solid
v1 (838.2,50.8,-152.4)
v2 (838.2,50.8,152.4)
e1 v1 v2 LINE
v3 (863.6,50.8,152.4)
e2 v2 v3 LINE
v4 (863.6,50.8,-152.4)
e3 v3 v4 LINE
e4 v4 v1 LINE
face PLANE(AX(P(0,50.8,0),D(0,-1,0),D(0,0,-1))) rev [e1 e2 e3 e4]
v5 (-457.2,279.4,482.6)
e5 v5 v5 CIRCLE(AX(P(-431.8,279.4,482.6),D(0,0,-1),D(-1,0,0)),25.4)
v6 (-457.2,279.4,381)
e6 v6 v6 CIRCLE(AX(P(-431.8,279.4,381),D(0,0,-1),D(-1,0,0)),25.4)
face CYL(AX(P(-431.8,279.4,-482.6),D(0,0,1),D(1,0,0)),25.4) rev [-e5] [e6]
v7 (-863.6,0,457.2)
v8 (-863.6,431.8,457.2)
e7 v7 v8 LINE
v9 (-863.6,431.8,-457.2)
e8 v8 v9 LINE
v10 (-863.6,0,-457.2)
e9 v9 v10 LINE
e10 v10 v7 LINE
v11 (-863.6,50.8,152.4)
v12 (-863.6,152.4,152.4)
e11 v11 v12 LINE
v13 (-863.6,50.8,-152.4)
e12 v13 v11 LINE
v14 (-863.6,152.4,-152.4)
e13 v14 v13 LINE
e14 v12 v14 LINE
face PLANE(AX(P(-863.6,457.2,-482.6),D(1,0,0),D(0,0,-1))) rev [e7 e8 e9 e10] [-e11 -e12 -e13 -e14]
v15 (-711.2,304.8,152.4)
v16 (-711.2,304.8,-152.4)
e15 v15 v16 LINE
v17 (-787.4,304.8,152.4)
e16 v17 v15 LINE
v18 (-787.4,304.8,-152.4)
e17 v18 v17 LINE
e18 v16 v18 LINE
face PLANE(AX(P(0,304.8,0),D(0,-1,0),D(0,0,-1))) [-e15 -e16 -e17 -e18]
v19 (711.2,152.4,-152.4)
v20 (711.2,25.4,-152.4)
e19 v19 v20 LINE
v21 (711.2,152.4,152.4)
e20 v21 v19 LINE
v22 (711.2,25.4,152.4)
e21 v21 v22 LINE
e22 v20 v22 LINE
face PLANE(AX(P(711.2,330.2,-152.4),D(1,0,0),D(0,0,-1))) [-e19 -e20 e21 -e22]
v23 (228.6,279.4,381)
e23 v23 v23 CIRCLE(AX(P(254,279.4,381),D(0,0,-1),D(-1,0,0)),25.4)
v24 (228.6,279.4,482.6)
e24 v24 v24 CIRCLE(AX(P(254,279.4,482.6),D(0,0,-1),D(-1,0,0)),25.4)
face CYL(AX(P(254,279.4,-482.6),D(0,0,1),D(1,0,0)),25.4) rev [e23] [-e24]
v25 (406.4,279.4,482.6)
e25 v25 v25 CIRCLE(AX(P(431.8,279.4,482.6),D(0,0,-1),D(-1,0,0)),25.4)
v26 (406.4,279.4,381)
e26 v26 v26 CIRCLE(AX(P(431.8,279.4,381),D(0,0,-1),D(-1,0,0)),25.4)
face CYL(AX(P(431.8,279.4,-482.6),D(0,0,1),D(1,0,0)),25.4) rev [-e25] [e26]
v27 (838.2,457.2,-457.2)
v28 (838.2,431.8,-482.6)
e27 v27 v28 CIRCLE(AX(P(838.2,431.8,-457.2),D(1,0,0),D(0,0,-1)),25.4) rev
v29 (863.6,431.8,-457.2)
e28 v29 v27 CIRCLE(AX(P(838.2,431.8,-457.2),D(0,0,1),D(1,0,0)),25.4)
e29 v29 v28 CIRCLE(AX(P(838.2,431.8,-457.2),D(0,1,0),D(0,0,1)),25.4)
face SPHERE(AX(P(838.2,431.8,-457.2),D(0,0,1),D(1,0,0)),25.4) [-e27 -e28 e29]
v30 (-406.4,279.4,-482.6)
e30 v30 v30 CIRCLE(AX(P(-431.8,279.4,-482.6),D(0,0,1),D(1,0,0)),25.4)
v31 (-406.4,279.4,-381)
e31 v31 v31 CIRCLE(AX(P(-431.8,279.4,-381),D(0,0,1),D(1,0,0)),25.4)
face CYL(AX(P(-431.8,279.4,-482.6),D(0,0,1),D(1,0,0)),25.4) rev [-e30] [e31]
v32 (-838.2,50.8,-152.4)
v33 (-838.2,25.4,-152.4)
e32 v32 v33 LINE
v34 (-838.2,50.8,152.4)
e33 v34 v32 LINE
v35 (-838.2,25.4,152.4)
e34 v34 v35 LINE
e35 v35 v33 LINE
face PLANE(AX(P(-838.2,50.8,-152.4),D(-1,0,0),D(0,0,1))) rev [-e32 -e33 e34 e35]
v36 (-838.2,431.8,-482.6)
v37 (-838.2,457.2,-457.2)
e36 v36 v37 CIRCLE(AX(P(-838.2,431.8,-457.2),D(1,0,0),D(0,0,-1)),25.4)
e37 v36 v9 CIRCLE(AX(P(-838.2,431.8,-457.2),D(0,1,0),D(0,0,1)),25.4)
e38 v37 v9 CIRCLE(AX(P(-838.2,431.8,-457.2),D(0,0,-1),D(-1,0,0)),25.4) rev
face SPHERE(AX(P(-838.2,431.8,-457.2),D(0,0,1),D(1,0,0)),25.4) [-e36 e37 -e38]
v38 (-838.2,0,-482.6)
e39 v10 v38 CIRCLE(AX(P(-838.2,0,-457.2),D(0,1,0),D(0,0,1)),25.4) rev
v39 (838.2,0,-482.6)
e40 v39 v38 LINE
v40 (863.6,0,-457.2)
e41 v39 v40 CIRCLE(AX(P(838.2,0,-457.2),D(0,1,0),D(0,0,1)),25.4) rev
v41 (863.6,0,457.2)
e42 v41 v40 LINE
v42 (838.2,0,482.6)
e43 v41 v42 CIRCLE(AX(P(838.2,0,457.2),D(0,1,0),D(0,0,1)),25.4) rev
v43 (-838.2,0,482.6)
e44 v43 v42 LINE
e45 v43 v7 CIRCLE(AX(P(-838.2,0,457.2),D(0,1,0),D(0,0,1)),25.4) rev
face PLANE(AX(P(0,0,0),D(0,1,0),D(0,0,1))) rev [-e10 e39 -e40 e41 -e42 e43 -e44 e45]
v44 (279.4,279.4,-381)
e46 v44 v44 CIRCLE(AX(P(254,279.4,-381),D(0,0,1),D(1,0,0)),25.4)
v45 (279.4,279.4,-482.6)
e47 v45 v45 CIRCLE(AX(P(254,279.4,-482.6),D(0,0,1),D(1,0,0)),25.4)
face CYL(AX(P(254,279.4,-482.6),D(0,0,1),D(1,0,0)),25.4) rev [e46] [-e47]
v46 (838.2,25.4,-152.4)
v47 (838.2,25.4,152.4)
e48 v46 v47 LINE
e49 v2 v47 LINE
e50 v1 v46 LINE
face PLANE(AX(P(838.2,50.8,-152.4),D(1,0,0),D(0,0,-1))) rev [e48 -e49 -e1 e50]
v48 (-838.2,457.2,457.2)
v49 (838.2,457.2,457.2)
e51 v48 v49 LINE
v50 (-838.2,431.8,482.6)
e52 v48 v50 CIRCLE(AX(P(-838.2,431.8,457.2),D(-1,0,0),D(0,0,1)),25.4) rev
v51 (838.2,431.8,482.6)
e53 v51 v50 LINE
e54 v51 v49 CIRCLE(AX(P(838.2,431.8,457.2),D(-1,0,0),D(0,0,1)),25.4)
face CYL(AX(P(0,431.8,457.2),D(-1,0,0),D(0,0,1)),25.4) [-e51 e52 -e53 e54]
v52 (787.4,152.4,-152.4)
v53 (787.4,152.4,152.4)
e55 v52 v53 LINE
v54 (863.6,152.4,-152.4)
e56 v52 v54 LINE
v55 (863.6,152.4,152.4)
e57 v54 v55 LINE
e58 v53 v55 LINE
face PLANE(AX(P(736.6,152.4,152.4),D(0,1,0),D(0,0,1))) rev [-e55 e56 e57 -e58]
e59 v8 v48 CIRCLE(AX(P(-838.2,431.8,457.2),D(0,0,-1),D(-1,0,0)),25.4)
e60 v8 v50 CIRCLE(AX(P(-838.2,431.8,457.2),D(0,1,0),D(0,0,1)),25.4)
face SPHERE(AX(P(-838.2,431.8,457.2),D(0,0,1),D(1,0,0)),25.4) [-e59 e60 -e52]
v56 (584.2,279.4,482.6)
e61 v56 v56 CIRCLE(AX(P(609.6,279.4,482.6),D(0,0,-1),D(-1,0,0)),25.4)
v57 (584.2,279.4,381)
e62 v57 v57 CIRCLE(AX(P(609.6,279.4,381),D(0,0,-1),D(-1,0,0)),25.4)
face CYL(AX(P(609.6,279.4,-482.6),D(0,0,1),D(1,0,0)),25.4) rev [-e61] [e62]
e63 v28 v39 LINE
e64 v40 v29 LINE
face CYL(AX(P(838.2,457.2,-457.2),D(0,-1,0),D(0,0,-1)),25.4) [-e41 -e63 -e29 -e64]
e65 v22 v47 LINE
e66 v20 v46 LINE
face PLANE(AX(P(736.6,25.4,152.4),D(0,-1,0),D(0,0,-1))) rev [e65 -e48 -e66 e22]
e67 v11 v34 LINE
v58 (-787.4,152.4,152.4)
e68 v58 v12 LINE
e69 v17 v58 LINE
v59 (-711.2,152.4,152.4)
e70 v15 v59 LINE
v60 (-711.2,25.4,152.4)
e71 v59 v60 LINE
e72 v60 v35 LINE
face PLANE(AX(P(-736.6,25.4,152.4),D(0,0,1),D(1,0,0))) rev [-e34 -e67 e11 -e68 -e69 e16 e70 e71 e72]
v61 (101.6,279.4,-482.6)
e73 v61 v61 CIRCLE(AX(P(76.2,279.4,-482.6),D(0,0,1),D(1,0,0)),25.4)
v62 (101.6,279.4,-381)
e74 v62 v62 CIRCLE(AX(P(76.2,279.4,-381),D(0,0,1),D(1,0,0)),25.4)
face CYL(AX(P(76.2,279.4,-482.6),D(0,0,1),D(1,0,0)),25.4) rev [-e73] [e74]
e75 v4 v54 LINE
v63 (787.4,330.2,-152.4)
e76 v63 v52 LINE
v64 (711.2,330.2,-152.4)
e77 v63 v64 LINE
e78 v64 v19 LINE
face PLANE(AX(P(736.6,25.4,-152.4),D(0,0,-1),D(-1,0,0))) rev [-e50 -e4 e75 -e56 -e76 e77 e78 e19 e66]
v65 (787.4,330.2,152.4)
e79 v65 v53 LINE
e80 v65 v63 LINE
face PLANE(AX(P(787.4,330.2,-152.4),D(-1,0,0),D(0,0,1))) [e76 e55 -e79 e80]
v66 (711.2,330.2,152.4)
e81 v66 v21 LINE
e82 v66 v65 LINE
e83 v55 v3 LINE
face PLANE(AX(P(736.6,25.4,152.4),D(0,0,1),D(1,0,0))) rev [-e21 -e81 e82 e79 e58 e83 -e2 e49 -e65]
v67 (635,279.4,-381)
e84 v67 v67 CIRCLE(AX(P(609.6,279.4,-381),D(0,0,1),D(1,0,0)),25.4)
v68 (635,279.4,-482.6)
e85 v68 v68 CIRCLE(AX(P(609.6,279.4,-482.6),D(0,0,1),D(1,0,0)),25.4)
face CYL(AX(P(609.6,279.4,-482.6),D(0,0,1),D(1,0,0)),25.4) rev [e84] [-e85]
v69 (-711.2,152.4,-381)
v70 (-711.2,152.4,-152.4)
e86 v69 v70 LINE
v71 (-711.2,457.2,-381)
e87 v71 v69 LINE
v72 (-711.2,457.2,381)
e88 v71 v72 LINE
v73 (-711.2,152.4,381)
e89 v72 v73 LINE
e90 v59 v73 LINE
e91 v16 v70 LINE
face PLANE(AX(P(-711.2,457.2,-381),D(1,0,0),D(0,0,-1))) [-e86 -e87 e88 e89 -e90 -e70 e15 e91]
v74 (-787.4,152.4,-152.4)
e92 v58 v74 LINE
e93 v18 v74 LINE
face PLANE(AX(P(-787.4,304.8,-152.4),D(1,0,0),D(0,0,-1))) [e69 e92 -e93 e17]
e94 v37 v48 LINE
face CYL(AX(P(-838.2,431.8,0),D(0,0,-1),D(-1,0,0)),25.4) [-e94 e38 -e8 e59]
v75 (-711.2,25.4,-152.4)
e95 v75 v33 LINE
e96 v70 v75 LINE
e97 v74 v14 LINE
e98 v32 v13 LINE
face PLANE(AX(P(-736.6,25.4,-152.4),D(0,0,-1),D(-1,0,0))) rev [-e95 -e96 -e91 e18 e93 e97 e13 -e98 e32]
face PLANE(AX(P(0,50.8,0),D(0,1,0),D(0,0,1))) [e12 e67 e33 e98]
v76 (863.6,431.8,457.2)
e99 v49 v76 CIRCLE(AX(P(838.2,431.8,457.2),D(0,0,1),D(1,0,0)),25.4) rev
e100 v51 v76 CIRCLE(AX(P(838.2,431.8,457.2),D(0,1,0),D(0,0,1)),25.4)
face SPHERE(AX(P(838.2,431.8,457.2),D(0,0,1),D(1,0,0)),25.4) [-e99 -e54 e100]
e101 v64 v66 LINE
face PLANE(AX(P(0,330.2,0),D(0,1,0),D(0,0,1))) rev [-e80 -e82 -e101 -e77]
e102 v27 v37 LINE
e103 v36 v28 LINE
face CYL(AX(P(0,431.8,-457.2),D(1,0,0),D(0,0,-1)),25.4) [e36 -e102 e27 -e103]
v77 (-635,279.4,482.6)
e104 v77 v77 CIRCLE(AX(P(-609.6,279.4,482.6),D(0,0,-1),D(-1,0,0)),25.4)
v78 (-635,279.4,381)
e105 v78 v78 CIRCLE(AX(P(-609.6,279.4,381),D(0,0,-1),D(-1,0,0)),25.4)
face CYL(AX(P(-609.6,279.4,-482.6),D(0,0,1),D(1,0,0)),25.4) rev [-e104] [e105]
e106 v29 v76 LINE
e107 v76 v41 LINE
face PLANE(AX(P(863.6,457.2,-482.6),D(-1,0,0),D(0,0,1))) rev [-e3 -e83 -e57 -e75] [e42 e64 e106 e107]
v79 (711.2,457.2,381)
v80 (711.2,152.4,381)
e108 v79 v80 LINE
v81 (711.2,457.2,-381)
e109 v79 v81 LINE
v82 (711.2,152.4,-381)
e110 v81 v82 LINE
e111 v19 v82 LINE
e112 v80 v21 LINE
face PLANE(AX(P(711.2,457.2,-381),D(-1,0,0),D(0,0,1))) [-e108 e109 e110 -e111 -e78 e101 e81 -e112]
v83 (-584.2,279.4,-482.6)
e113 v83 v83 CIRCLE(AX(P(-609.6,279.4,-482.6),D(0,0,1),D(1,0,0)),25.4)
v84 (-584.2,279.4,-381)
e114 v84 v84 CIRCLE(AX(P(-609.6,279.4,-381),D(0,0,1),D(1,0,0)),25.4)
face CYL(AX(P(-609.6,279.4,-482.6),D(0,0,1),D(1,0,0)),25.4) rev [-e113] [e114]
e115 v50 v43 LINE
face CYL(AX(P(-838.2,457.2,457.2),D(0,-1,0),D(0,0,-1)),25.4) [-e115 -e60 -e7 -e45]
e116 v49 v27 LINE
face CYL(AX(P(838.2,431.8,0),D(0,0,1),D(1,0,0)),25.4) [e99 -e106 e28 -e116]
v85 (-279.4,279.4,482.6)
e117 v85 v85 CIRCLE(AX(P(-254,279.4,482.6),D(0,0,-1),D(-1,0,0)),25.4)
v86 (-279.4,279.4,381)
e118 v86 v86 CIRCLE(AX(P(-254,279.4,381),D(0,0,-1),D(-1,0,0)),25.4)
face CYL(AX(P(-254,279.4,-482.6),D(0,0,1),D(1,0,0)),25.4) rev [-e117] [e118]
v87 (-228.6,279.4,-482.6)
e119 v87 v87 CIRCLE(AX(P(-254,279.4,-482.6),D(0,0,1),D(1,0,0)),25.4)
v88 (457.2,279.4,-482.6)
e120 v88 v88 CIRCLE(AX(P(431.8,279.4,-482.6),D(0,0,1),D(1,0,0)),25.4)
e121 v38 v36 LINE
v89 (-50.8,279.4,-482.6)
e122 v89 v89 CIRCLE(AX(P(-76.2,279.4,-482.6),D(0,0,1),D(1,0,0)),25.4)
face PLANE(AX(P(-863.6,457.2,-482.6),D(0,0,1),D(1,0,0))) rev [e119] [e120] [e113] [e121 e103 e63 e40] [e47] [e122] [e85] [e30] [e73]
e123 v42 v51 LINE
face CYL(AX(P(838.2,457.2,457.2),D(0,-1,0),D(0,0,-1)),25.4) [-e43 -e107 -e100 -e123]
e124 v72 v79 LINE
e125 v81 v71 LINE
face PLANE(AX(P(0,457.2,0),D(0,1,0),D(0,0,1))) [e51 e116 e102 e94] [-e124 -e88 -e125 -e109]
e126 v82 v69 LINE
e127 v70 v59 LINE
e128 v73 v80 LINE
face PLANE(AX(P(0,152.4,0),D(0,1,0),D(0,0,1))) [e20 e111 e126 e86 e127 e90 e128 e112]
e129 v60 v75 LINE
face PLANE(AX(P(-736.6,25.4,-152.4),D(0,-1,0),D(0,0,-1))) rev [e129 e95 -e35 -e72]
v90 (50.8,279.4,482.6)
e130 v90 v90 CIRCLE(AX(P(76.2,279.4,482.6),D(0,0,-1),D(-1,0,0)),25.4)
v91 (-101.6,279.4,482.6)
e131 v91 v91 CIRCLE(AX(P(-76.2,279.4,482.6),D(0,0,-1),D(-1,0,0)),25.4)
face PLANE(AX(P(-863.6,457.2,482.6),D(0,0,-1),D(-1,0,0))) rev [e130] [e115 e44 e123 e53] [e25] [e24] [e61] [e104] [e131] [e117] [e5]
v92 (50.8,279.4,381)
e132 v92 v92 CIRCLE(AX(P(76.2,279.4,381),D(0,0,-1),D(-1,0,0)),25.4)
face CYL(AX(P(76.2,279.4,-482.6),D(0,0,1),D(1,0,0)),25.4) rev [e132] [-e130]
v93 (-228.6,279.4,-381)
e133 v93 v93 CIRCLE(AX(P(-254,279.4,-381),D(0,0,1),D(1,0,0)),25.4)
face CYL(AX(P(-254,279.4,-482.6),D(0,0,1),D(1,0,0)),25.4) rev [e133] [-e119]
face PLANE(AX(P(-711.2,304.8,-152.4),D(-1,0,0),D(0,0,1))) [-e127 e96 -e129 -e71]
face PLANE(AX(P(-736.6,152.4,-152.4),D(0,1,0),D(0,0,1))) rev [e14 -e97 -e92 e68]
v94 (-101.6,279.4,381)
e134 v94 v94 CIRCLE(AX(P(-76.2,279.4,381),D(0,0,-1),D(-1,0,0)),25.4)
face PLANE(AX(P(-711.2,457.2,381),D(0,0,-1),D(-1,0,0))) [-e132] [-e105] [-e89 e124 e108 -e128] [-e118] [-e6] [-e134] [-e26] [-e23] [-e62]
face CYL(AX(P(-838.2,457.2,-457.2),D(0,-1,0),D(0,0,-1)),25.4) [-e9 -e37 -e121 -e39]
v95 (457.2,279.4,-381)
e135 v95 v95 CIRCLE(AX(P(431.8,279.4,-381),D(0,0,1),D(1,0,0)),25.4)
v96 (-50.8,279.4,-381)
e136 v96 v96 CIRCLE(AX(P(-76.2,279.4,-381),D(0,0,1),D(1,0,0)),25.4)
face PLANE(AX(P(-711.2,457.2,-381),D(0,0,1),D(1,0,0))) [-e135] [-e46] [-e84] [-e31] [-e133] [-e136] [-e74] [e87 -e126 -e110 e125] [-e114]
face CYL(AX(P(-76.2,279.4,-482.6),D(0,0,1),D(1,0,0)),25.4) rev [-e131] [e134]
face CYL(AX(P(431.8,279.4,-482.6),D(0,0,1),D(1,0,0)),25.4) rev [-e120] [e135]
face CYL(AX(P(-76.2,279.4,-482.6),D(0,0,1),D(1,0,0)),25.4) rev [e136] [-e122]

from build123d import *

# Parameters (mm, degrees)
SKETCH1_W               = 1727.2
SKETCH1_H               = 965.2
SKETCH1_W_2             = 1422.4
SKETCH1_H_2             = 762
BOSS_EXTRUDE1_DEPTH     = 457.2
SKETCH2_W               = 1422.4
SKETCH2_H               = 762
BOSS_EXTRUDE2_DEPTH     = 152.4
CUT_EXTRUDE1_DEPTH      = 1374.480192795
CUT_EXTRUDE1_DEPTH_BACK = 1374.480192795
SKETCH4_R               = 25.4
SKETCH7_W               = 304.8
SKETCH7_H               = 127
CUT_EXTRUDE2_DEPTH      = 127
SKETCH8_W               = 76.2
SKETCH8_H               = 304.8
CUT_EXTRUDE3_DEPTH      = 304.8
SKETCH9_W               = 25.4
SKETCH9_H               = 304.8
BOSS_EXTRUDE3_DEPTH     = 25.4
SKETCH11_W              = 304.8
SKETCH11_H              = 127
CUT_EXTRUDE5_DEPTH      = 127
SKETCH13_W              = 25.4
SKETCH13_H              = 304.8
BOSS_EXTRUDE4_DEPTH     = 25.4
SKETCH14_W              = 76.2
SKETCH14_H              = 304.8
CUT_EXTRUDE7_DEPTH      = 279.4
FILLET1_R               = 25.4
FILLET2_R               = 25.4


with BuildPart() as part:
    # Sketch1 → Boss-Extrude1 (new body)
    with BuildSketch(Plane(origin=(0, 0, 0), x_dir=(1, 0, 0), z_dir=(0, 1, 0))):
        Rectangle(SKETCH1_W, SKETCH1_H)
        Rectangle(SKETCH1_W_2, SKETCH1_H_2, mode=Mode.SUBTRACT)
    extrude(amount=BOSS_EXTRUDE1_DEPTH)

    # Sketch2 → Boss-Extrude2 (add)
    with BuildSketch(Plane(origin=(0, 0, 0), x_dir=(1, 0, 0), z_dir=(0, 1, 0))):
        Rectangle(SKETCH2_W, SKETCH2_H)
    extrude(amount=BOSS_EXTRUDE2_DEPTH)

    # Sketch4 → Cut-Extrude1 (cut, two sides: drawn at the far end of the back side and taken through both)
    with BuildSketch(Plane.XY.offset(482.6).offset(-CUT_EXTRUDE1_DEPTH_BACK)):
        with Locations((-609.6, 279.4)):
            Circle(SKETCH4_R)
        with Locations((-431.8, 279.4)):
            Circle(SKETCH4_R)
        with Locations((-254, 279.4)):
            Circle(SKETCH4_R)
        with Locations((-76.2, 279.4)):
            Circle(SKETCH4_R)
        with Locations((76.2, 279.4)):
            Circle(SKETCH4_R)
        with Locations((254, 279.4)):
            Circle(SKETCH4_R)
        with Locations((431.8, 279.4)):
            Circle(SKETCH4_R)
        with Locations((609.6, 279.4)):
            Circle(SKETCH4_R)
    extrude(amount=CUT_EXTRUDE1_DEPTH + CUT_EXTRUDE1_DEPTH_BACK, mode=Mode.SUBTRACT)

    # Sketch7 → Cut-Extrude2 (cut)
    with BuildSketch(Plane(origin=(863.6, 0, 0), x_dir=(0, 0, -1), z_dir=(1, 0, 0))):
        with Locations((0, 88.9)):
            Rectangle(SKETCH7_W, SKETCH7_H)
    extrude(amount=-CUT_EXTRUDE2_DEPTH, mode=Mode.SUBTRACT)

    # Sketch8 → Cut-Extrude3 (cut)
    with BuildSketch(Plane(origin=(0, 25.4, 0), x_dir=(1, 0, 0), z_dir=(0, 1, 0))):
        with Locations((749.3, 0)):
            Rectangle(SKETCH8_W, SKETCH8_H)
    extrude(amount=CUT_EXTRUDE3_DEPTH, mode=Mode.SUBTRACT)

    # Sketch9 → Boss-Extrude3 (add)
    with BuildSketch(Plane(origin=(0, 25.4, 0), x_dir=(1, 0, 0), z_dir=(0, 1, 0))):
        with Locations((850.9, 0)):
            Rectangle(SKETCH9_W, SKETCH9_H)
    extrude(amount=BOSS_EXTRUDE3_DEPTH)

    # Sketch11 → Cut-Extrude5 (cut)
    with BuildSketch(Plane.ZY.offset(863.6)):
        with Locations((0, 88.9)):
            Rectangle(SKETCH11_W, SKETCH11_H)
    extrude(amount=-CUT_EXTRUDE5_DEPTH, mode=Mode.SUBTRACT)

    # Sketch13 → Boss-Extrude4 (add)
    with BuildSketch(Plane(origin=(0, 25.4, 0), x_dir=(1, 0, 0), z_dir=(0, 1, 0))):
        with Locations((-850.9, 0)):
            Rectangle(SKETCH13_W, SKETCH13_H)
    extrude(amount=BOSS_EXTRUDE4_DEPTH)

    # Sketch14 → Cut-Extrude7 (cut)
    with BuildSketch(Plane(origin=(0, 25.4, 0), x_dir=(1, 0, 0), z_dir=(0, 1, 0))):
        with Locations((-749.3, 0)):
            Rectangle(SKETCH14_W, SKETCH14_H)
    extrude(amount=CUT_EXTRUDE7_DEPTH, mode=Mode.SUBTRACT)

    # Fillet1
    fillet1_edges = [part.edges().sort_by_distance(p)[0] for p in [
        (863.6, 457.2, 0),
        (0, 457.2, -482.6),
        (-863.6, 457.2, 0),
        (0, 457.2, 482.6),
    ]]
    fillet(fillet1_edges, radius=FILLET1_R)

    # Fillet2
    # the kernel refuses this fillet: 25.4 mm, written as the material it takes off along each edge
    with BuildSketch(Plane(origin=(-838.2, 431.8, 457.2), x_dir=(0, 0, 1), z_dir=(-1, 0, 0))) as fillet2_piece_1_section:
        Polygon((0, 0), (FILLET2_R * 1.02, 0), (FILLET2_R * 1.02, FILLET2_R * 1.02), (0, FILLET2_R * 1.02), align=None)
    fillet2_piece_1 = extrude(amount=FILLET2_R * 1.02, mode=Mode.PRIVATE)
    fillet2_piece_1 = fillet2_piece_1 - Plane(origin=(-838.2, 431.8, 457.2), x_dir=(0, -0.7071067811865475, -0.7071067811865475), z_dir=(-1, 0, 0)) * Sphere(FILLET2_R, mode=Mode.PRIVATE)
    add(fillet2_piece_1, mode=Mode.SUBTRACT)
    with BuildSketch(Plane(origin=(-838.2, 431.8, -457.2), x_dir=(-1, 0, 0), z_dir=(0, 0, -1))) as fillet2_piece_2_section:
        Polygon((0, 0), (FILLET2_R * 1.02, 0), (FILLET2_R * 1.02, FILLET2_R * 1.02), (0, FILLET2_R * 1.02), align=None)
    fillet2_piece_2 = extrude(amount=FILLET2_R * 1.02, mode=Mode.PRIVATE)
    fillet2_piece_2 = fillet2_piece_2 - Plane(origin=(-838.2, 431.8, -457.2), x_dir=(0.7071067811865475, -0.7071067811865475, 0), z_dir=(0, 0, -1)) * Sphere(FILLET2_R, mode=Mode.PRIVATE)
    add(fillet2_piece_2, mode=Mode.SUBTRACT)
    with BuildSketch(Plane(origin=(838.2, 431.8, 457.2), x_dir=(0, 0, 1), z_dir=(1, 0, 0))) as fillet2_piece_3_section:
        Polygon((0, 0), (FILLET2_R * 1.02, 0), (FILLET2_R * 1.02, -FILLET2_R * 1.02), (0, -FILLET2_R * 1.02), align=None)
    fillet2_piece_3 = extrude(amount=FILLET2_R * 1.02, mode=Mode.PRIVATE)
    fillet2_piece_3 = fillet2_piece_3 - Plane(origin=(838.2, 431.8, 457.2), x_dir=(0, -0.7071067811865475, -0.7071067811865475), z_dir=(1, 0, 0)) * Sphere(FILLET2_R, mode=Mode.PRIVATE)
    add(fillet2_piece_3, mode=Mode.SUBTRACT)
    with BuildSketch(Plane(origin=(838.2, 431.8, -457.2), x_dir=(1, 0, 0), z_dir=(0, 0, -1))) as fillet2_piece_4_section:
        Polygon((0, 0), (FILLET2_R * 1.02, 0), (FILLET2_R * 1.02, -FILLET2_R * 1.02), (0, -FILLET2_R * 1.02), align=None)
    fillet2_piece_4 = extrude(amount=FILLET2_R * 1.02, mode=Mode.PRIVATE)
    fillet2_piece_4 = fillet2_piece_4 - Plane(origin=(838.2, 431.8, -457.2), x_dir=(-0.7071067811865475, -0.7071067811865475, 0), z_dir=(0, 0, -1)) * Sphere(FILLET2_R, mode=Mode.PRIVATE)
    add(fillet2_piece_4, mode=Mode.SUBTRACT)
    with BuildSketch(Plane(origin=(863.6, -63.5, -482.6), x_dir=(-1, 0, 0), z_dir=(0, 1, 0)), Plane(origin=(863.6, -63.5, 482.6), x_dir=(0, 0, -1), z_dir=(0, 1, 0))) as fillet2_piece_5:
        with BuildLine():
            CenterArc((FILLET2_R, FILLET2_R), FILLET2_R, 180, 90)
            Line((0, FILLET2_R), (0, 0))
            Line((0, 0), (FILLET2_R, 0))
        make_face()
    extrude(amount=495.3, mode=Mode.SUBTRACT)
    with BuildSketch(Plane(origin=(-863.6, -63.5, -482.6), x_dir=(1, 0, 0), z_dir=(0, 1, 0)), Plane(origin=(-863.6, -63.5, 482.6), x_dir=(0, 0, -1), z_dir=(0, 1, 0))) as fillet2_piece_6:
        with BuildLine():
            CenterArc((FILLET2_R, -FILLET2_R), FILLET2_R, 90, 90)
            Line((0, -FILLET2_R), (0, 0))
            Line((0, 0), (FILLET2_R, 0))
        make_face()
    extrude(amount=495.3, mode=Mode.SUBTRACT)


solid = part.part
